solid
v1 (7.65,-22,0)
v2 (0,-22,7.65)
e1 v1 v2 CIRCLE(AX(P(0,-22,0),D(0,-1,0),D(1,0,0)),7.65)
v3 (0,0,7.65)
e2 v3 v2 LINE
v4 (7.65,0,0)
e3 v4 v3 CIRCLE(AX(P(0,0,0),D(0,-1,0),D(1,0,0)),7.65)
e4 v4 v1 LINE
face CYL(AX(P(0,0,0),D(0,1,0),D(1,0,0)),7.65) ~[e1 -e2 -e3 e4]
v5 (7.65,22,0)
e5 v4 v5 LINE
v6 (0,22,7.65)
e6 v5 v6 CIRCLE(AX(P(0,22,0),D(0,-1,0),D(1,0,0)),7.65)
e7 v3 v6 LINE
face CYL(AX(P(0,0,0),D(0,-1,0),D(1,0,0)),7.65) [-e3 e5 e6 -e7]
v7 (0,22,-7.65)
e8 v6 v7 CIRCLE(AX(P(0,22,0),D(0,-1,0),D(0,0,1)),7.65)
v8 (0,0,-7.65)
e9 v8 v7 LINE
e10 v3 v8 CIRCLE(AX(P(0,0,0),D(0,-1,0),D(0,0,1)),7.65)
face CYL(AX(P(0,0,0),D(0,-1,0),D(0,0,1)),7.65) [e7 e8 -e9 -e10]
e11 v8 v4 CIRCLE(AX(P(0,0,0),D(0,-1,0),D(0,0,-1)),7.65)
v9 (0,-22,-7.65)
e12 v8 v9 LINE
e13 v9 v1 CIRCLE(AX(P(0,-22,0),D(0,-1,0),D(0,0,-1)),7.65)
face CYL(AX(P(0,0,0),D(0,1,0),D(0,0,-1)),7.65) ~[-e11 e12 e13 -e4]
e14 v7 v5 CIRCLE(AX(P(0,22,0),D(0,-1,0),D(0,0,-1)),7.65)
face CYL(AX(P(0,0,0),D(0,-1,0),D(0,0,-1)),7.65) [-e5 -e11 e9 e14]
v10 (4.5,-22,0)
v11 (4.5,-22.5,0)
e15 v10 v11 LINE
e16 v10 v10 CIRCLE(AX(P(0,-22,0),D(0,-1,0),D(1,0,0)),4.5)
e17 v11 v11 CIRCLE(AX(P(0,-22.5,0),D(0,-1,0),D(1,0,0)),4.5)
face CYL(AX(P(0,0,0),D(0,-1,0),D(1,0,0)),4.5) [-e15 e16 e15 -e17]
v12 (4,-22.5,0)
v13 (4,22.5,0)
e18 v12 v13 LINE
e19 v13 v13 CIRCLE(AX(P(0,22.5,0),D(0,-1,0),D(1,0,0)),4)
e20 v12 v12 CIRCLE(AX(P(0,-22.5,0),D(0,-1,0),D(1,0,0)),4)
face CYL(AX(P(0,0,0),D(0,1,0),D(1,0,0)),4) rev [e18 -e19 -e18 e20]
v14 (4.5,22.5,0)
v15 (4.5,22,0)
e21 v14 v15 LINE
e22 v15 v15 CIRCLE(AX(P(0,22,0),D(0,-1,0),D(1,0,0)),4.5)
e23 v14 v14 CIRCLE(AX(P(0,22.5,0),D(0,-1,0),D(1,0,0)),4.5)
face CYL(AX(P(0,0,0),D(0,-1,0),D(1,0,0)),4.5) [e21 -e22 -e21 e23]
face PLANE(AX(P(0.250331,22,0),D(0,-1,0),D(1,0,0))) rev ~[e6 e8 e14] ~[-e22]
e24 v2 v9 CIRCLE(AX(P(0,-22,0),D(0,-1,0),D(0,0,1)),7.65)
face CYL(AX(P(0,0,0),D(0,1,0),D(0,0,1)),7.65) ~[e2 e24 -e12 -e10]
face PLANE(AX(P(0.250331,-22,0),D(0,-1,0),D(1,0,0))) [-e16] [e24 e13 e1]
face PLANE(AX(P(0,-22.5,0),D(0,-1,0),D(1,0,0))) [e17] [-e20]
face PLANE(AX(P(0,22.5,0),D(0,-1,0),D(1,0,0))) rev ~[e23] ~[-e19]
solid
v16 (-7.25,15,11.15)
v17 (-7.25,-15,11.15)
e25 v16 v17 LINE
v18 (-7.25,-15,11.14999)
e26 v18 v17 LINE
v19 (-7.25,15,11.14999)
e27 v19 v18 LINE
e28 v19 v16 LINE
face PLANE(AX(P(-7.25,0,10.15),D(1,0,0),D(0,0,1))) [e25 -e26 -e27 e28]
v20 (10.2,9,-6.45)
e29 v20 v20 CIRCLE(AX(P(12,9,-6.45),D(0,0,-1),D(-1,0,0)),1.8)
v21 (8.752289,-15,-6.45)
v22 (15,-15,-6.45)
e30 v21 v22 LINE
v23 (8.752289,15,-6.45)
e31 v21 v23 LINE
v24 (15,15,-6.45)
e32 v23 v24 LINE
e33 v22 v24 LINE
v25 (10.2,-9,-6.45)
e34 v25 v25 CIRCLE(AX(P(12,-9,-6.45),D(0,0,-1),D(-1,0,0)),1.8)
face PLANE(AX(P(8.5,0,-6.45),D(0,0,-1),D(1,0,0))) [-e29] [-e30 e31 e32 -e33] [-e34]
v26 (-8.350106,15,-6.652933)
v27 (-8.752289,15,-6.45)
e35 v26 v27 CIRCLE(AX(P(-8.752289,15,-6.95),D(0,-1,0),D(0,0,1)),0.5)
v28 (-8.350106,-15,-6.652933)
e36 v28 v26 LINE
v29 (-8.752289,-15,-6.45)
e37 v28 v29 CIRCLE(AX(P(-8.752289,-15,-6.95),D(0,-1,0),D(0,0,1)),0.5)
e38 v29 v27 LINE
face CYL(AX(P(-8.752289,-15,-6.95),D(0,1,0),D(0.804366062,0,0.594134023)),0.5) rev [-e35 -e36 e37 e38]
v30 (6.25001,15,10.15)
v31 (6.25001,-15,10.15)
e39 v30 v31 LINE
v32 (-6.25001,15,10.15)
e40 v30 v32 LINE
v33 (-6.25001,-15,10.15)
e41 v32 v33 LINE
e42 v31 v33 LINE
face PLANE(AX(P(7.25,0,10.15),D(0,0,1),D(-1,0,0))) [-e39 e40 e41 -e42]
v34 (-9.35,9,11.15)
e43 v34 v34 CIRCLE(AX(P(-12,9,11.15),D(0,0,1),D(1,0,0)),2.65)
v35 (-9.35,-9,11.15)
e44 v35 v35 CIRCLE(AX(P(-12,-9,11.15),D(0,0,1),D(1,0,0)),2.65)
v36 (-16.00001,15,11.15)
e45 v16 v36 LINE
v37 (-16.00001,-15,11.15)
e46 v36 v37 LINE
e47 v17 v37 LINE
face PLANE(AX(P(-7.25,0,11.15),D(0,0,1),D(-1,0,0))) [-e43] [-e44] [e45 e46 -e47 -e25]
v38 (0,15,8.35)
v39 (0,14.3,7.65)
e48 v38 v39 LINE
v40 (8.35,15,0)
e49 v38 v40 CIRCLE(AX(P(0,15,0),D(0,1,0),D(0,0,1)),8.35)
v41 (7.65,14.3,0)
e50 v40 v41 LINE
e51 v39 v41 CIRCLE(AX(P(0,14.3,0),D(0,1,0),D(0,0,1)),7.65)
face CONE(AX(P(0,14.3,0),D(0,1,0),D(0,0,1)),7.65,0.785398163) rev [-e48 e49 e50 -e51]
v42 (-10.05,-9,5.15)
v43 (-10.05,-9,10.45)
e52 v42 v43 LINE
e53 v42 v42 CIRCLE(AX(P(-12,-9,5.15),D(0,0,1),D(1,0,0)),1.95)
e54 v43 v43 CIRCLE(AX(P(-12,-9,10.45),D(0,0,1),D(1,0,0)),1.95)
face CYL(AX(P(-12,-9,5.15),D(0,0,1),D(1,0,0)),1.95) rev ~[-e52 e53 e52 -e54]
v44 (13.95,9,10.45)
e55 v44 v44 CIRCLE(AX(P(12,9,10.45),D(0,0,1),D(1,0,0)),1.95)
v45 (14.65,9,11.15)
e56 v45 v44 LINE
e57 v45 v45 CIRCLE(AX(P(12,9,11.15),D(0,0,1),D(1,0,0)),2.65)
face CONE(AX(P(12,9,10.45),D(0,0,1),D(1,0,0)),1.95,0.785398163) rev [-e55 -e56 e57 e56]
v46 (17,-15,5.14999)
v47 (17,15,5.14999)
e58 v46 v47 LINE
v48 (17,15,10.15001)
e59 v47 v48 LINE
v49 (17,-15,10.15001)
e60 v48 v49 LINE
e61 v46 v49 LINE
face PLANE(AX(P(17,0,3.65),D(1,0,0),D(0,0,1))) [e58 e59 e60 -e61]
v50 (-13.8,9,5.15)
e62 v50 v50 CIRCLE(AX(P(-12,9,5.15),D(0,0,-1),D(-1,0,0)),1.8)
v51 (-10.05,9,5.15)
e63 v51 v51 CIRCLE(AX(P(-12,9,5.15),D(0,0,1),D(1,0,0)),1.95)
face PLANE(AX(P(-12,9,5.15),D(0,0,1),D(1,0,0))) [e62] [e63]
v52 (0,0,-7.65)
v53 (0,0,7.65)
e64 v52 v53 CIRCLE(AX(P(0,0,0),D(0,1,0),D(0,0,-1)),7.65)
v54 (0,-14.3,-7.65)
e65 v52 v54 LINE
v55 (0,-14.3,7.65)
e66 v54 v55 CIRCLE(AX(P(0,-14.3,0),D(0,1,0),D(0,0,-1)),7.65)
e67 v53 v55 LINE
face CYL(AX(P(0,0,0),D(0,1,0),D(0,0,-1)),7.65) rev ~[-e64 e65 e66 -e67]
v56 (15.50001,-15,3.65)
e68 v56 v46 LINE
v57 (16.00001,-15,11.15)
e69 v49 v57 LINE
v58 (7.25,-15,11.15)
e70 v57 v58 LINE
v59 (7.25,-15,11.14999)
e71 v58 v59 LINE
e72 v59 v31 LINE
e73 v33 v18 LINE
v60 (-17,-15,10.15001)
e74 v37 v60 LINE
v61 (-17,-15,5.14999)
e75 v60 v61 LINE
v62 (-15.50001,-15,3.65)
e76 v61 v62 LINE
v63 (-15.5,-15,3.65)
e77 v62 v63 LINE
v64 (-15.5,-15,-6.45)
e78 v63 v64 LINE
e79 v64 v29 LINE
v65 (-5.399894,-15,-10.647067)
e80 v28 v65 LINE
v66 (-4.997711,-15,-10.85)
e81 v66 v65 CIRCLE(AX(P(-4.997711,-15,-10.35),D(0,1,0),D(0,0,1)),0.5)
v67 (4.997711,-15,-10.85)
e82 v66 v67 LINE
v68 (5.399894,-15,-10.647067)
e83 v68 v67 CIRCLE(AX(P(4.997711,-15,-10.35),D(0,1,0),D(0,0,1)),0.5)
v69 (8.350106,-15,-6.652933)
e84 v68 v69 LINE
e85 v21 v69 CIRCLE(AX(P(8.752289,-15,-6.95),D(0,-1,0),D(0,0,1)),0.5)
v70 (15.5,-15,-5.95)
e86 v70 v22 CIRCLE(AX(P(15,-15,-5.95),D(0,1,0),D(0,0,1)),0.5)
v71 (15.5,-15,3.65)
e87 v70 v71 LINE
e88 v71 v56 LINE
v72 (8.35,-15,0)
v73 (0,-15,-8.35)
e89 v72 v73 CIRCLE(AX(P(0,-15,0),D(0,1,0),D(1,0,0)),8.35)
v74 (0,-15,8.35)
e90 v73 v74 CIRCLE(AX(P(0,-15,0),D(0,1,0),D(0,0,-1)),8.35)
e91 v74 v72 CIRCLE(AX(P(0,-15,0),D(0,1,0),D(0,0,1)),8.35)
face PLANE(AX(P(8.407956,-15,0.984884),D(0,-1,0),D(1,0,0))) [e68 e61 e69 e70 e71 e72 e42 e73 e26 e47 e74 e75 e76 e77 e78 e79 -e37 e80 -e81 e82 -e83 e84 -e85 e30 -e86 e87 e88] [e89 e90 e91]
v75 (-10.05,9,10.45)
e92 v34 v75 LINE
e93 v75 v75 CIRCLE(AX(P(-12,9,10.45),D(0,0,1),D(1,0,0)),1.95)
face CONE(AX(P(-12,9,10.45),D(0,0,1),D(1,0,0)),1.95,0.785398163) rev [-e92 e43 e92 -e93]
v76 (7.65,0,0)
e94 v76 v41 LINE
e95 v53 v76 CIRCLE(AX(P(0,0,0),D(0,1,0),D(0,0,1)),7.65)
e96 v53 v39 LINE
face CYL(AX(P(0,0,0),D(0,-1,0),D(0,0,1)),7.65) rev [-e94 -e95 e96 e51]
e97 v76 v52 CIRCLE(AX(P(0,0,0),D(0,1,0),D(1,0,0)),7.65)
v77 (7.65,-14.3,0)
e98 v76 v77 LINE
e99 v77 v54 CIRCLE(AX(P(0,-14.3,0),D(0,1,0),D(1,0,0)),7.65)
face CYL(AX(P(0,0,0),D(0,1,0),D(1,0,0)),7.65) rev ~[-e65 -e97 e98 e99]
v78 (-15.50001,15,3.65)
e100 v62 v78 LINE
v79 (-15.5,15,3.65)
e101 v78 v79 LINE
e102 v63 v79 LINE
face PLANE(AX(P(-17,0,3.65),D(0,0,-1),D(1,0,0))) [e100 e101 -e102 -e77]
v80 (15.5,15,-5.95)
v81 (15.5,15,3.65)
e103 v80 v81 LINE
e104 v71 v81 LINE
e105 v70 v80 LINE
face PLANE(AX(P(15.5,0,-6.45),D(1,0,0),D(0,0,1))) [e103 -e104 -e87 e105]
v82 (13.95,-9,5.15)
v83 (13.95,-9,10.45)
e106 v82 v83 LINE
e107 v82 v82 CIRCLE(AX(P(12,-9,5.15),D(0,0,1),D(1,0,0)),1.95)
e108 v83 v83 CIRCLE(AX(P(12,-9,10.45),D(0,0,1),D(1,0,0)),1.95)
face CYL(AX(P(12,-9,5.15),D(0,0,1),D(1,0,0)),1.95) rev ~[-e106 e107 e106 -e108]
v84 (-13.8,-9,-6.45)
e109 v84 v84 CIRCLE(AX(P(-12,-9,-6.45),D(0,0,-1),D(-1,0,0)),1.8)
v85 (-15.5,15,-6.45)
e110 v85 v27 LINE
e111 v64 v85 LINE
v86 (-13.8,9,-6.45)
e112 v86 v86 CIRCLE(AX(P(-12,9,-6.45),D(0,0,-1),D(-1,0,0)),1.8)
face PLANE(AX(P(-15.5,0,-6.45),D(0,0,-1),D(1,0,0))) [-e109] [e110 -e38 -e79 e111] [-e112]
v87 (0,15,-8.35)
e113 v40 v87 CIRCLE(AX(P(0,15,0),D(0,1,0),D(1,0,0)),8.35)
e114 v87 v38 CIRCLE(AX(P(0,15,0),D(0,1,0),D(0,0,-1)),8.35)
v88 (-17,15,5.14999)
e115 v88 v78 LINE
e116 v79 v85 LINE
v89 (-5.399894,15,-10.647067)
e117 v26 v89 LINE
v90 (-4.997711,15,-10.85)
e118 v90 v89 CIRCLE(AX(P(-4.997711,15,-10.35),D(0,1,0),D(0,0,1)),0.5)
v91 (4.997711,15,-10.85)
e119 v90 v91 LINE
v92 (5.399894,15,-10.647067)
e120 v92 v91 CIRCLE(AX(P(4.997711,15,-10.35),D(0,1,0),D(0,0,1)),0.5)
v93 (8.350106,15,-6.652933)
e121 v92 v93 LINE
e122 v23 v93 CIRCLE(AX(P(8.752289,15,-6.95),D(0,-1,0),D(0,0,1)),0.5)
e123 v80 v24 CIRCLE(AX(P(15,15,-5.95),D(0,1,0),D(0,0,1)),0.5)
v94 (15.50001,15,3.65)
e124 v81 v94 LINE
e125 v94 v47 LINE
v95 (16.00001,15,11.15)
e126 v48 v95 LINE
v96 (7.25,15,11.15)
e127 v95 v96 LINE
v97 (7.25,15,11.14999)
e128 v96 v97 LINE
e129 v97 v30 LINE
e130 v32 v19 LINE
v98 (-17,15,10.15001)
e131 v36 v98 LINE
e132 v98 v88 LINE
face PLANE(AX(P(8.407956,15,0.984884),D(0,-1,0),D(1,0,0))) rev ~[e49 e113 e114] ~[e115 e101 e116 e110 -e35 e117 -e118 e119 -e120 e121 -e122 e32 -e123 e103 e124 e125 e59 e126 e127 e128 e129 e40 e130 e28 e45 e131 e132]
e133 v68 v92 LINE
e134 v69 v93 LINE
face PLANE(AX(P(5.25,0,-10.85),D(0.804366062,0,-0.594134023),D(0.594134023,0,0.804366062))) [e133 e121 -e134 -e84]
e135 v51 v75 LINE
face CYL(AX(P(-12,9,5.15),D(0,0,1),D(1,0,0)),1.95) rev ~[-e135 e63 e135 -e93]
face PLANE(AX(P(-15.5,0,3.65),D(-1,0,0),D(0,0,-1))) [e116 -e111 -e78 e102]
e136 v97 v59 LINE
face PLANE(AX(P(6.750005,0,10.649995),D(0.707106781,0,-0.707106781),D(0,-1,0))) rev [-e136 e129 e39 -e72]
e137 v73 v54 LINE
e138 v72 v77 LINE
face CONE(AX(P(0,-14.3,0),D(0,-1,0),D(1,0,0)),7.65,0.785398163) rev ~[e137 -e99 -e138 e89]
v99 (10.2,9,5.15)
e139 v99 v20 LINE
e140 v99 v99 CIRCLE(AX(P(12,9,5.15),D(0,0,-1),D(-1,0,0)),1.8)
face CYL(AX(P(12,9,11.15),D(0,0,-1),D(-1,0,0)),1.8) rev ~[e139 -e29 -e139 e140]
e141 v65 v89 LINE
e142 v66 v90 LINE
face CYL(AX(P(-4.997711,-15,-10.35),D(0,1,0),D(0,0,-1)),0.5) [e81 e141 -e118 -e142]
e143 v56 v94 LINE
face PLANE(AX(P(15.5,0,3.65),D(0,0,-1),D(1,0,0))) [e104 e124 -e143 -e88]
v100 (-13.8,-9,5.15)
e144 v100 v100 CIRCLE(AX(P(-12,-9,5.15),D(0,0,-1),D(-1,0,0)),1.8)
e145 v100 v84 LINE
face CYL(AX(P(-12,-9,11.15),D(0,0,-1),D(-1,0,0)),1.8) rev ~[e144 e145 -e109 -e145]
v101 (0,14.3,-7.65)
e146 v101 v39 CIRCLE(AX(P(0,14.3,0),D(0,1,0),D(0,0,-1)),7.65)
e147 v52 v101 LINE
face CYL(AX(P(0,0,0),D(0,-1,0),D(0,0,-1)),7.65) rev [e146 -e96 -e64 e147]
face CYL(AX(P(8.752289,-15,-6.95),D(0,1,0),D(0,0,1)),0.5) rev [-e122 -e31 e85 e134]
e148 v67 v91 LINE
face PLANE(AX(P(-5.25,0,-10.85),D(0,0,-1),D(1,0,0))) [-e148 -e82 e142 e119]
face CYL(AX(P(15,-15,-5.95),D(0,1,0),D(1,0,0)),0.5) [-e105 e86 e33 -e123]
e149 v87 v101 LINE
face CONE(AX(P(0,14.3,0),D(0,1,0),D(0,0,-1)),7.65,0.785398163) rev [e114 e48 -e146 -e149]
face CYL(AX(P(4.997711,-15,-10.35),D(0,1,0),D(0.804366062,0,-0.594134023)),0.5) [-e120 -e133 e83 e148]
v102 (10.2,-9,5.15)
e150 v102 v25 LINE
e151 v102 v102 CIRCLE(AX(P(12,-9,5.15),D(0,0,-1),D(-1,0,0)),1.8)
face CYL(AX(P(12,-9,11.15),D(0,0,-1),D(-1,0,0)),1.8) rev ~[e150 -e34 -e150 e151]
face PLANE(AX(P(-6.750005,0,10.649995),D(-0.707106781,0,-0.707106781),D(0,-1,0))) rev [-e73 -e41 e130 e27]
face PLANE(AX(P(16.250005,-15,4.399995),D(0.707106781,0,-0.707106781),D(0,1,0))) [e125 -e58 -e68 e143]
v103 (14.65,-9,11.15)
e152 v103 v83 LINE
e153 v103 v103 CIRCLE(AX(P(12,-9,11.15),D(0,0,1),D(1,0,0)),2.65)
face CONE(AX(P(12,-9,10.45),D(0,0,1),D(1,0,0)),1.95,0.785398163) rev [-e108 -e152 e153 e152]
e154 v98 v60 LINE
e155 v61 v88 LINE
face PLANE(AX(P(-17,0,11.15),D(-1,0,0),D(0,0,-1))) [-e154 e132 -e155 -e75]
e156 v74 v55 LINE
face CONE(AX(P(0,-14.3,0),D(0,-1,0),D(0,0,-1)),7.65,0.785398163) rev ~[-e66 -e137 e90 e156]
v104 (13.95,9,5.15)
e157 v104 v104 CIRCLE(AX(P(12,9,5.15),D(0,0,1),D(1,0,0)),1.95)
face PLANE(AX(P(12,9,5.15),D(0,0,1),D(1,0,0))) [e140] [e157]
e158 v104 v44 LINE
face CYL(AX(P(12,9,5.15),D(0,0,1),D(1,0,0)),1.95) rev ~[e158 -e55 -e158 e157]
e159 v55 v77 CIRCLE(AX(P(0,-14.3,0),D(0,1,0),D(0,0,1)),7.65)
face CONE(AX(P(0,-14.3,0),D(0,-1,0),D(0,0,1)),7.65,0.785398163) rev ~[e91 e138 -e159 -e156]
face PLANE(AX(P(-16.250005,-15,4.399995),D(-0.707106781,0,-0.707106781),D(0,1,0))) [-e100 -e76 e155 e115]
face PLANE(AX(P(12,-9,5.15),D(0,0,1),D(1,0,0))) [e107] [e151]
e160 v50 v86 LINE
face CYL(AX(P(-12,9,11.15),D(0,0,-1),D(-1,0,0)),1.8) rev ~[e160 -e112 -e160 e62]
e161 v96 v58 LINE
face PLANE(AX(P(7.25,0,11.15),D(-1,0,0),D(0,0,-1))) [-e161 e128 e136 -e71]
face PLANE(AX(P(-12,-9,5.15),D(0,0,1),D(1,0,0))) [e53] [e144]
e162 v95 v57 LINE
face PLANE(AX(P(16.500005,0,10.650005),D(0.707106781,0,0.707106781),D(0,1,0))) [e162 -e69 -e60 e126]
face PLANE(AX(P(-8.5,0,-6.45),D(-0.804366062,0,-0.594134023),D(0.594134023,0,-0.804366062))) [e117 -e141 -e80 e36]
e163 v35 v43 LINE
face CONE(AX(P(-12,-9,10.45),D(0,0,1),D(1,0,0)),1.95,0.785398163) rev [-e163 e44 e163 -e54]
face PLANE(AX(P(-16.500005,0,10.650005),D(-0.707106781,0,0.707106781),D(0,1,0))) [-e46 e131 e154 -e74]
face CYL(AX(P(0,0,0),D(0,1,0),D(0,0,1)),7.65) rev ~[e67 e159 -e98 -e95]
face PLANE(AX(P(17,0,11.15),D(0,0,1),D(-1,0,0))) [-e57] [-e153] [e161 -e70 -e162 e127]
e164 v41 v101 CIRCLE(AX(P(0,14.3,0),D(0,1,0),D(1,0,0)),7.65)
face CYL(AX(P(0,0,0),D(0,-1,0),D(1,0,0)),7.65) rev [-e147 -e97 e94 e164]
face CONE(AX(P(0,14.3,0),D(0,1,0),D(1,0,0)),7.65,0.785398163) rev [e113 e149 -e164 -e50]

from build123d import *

# Parameters (mm, degrees)
F1_DEPTH       = 15
F2_SIZE        = 0.99999
F3_SIZE        = 1.49999
F4_R           = 0.5
F6_D           = 3.6
F6_CBORE_D     = 3.9
F6_CBORE_DEPTH = 6
F7_SIZE        = 0.7
F0_R           = 4.5
F8_DEPTH       = 22
F0_R_2         = 4
F9_DEPTH       = 22.5


# Not quite as in the source:
# - a fillet or chamfer is up to 0.001 mm smaller than in the source, because OpenCascade refuses the exact size


with BuildPart() as f1:
    # F0 (on Front) → F1 (new body, symmetric)
    with BuildSketch(Plane.XZ):
        with BuildLine():
            ThreePointArc((0, 7.65), (5.4093668761, 5.4093668761), (7.65, 0))
            ThreePointArc((7.65, 0), (5.4093668761, -5.4093668761), (0, -7.65))
            Line((0, -7.65), (0, -10.85))
            Line((0, -10.85), (5.25, -10.85))
            Line((5.25, -10.85), (8.5, -6.45))
            Line((8.5, -6.45), (15.5, -6.45))
            Line((15.5, -6.45), (15.5, 3.65))
            Line((15.5, 3.65), (17, 3.65))
            Line((17, 3.65), (17, 11.15))
            Line((17, 11.15), (7.25, 11.15))
            Line((7.25, 11.15), (7.25, 10.15))
            Line((7.25, 10.15), (0, 10.15))
            Line((0, 10.15), (0, 7.65))
        make_face()
        with BuildLine():
            ThreePointArc((0, -7.65), (-7.65, 0), (0, 7.65))
            Line((0, 7.65), (0, 10.15))
            Line((0, 10.15), (-7.25, 10.15))
            Line((-7.25, 10.15), (-7.25, 11.15))
            Line((-7.25, 11.15), (-17, 11.15))
            Line((-17, 11.15), (-17, 3.65))
            Line((-17, 3.65), (-15.5, 3.65))
            Line((-15.5, 3.65), (-15.5, -6.45))
            Line((-15.5, -6.45), (-8.5, -6.45))
            Line((-8.5, -6.45), (-5.25, -10.85))
            Line((-5.25, -10.85), (0, -10.85))
            Line((0, -10.85), (0, -7.65))
        make_face()
    extrude(amount=F1_DEPTH, both=True)

    # F2 (size 1 in the source; OpenCascade refuses exactly that, so slightly less here)
    f2_edges = [f1.edges().sort_by_distance(p)[0] for p in [
        (7.25, 0, 10.15),
        (17, 0, 11.15),
        (-7.25, 0, 10.15),
        (-17, 0, 11.15),
    ]]
    chamfer(f2_edges, length=F2_SIZE)

    # F3 (size 1.5 in the source; OpenCascade refuses exactly that, so slightly less here)
    f3_edges = [f1.edges().sort_by_distance(p)[0] for p in [
        (17, 0, 3.65),
        (-17, 0, 3.65),
    ]]
    chamfer(f3_edges, length=F3_SIZE)

    # F4
    f4_edges = [f1.edges().sort_by_distance(p)[0] for p in [
        (15.5, 0, -6.45),
        (8.5, 0, -6.45),
        (5.25, 0, -10.85),
        (-5.25, 0, -10.85),
        (-8.5, 0, -6.45),
    ]]
    fillet(f4_edges, radius=F4_R)

    # F6 (through all)
    with Locations(Plane.XY.offset(11.15)):
        with Locations((12, 9), (12, -9), (-12, 9), (-12, -9)):
            CounterBoreHole(F6_D / 2, F6_CBORE_D / 2, F6_CBORE_DEPTH)

    # F7
    f7_edges = [f1.edges().sort_by_distance(p)[0] for p in [
        (-7.65, -15, 0),
        (-7.65, 15, 0),
        (10.05, 9, 11.15),
        (10.05, -9, 11.15),
        (-13.95, 9, 11.15),
        (-13.95, -9, 11.15),
    ]]
    chamfer(f7_edges, length=F7_SIZE)


with BuildPart() as f8:
    # F0 (on Front) → F8 (new body, symmetric)
    with BuildSketch(Plane.XZ):
        with BuildLine():
            ThreePointArc((0, -7.65), (5.4093668761, -5.4093668761), (7.65, 0))
            ThreePointArc((7.65, 0), (5.4093668761, 5.4093668761), (0, 7.65))
            ThreePointArc((0, 7.65), (-7.65, 0), (0, -7.65))
        make_face()
        Circle(F0_R, mode=Mode.SUBTRACT)
    extrude(amount=F8_DEPTH, both=True)

    # F0 (on Front) → F9 (join, symmetric)
    with BuildSketch(Plane.XZ):
        Circle(F0_R)
        Circle(F0_R_2, mode=Mode.SUBTRACT)
    extrude(amount=F9_DEPTH, both=True)


solid = Compound([f1.part, f8.part])
